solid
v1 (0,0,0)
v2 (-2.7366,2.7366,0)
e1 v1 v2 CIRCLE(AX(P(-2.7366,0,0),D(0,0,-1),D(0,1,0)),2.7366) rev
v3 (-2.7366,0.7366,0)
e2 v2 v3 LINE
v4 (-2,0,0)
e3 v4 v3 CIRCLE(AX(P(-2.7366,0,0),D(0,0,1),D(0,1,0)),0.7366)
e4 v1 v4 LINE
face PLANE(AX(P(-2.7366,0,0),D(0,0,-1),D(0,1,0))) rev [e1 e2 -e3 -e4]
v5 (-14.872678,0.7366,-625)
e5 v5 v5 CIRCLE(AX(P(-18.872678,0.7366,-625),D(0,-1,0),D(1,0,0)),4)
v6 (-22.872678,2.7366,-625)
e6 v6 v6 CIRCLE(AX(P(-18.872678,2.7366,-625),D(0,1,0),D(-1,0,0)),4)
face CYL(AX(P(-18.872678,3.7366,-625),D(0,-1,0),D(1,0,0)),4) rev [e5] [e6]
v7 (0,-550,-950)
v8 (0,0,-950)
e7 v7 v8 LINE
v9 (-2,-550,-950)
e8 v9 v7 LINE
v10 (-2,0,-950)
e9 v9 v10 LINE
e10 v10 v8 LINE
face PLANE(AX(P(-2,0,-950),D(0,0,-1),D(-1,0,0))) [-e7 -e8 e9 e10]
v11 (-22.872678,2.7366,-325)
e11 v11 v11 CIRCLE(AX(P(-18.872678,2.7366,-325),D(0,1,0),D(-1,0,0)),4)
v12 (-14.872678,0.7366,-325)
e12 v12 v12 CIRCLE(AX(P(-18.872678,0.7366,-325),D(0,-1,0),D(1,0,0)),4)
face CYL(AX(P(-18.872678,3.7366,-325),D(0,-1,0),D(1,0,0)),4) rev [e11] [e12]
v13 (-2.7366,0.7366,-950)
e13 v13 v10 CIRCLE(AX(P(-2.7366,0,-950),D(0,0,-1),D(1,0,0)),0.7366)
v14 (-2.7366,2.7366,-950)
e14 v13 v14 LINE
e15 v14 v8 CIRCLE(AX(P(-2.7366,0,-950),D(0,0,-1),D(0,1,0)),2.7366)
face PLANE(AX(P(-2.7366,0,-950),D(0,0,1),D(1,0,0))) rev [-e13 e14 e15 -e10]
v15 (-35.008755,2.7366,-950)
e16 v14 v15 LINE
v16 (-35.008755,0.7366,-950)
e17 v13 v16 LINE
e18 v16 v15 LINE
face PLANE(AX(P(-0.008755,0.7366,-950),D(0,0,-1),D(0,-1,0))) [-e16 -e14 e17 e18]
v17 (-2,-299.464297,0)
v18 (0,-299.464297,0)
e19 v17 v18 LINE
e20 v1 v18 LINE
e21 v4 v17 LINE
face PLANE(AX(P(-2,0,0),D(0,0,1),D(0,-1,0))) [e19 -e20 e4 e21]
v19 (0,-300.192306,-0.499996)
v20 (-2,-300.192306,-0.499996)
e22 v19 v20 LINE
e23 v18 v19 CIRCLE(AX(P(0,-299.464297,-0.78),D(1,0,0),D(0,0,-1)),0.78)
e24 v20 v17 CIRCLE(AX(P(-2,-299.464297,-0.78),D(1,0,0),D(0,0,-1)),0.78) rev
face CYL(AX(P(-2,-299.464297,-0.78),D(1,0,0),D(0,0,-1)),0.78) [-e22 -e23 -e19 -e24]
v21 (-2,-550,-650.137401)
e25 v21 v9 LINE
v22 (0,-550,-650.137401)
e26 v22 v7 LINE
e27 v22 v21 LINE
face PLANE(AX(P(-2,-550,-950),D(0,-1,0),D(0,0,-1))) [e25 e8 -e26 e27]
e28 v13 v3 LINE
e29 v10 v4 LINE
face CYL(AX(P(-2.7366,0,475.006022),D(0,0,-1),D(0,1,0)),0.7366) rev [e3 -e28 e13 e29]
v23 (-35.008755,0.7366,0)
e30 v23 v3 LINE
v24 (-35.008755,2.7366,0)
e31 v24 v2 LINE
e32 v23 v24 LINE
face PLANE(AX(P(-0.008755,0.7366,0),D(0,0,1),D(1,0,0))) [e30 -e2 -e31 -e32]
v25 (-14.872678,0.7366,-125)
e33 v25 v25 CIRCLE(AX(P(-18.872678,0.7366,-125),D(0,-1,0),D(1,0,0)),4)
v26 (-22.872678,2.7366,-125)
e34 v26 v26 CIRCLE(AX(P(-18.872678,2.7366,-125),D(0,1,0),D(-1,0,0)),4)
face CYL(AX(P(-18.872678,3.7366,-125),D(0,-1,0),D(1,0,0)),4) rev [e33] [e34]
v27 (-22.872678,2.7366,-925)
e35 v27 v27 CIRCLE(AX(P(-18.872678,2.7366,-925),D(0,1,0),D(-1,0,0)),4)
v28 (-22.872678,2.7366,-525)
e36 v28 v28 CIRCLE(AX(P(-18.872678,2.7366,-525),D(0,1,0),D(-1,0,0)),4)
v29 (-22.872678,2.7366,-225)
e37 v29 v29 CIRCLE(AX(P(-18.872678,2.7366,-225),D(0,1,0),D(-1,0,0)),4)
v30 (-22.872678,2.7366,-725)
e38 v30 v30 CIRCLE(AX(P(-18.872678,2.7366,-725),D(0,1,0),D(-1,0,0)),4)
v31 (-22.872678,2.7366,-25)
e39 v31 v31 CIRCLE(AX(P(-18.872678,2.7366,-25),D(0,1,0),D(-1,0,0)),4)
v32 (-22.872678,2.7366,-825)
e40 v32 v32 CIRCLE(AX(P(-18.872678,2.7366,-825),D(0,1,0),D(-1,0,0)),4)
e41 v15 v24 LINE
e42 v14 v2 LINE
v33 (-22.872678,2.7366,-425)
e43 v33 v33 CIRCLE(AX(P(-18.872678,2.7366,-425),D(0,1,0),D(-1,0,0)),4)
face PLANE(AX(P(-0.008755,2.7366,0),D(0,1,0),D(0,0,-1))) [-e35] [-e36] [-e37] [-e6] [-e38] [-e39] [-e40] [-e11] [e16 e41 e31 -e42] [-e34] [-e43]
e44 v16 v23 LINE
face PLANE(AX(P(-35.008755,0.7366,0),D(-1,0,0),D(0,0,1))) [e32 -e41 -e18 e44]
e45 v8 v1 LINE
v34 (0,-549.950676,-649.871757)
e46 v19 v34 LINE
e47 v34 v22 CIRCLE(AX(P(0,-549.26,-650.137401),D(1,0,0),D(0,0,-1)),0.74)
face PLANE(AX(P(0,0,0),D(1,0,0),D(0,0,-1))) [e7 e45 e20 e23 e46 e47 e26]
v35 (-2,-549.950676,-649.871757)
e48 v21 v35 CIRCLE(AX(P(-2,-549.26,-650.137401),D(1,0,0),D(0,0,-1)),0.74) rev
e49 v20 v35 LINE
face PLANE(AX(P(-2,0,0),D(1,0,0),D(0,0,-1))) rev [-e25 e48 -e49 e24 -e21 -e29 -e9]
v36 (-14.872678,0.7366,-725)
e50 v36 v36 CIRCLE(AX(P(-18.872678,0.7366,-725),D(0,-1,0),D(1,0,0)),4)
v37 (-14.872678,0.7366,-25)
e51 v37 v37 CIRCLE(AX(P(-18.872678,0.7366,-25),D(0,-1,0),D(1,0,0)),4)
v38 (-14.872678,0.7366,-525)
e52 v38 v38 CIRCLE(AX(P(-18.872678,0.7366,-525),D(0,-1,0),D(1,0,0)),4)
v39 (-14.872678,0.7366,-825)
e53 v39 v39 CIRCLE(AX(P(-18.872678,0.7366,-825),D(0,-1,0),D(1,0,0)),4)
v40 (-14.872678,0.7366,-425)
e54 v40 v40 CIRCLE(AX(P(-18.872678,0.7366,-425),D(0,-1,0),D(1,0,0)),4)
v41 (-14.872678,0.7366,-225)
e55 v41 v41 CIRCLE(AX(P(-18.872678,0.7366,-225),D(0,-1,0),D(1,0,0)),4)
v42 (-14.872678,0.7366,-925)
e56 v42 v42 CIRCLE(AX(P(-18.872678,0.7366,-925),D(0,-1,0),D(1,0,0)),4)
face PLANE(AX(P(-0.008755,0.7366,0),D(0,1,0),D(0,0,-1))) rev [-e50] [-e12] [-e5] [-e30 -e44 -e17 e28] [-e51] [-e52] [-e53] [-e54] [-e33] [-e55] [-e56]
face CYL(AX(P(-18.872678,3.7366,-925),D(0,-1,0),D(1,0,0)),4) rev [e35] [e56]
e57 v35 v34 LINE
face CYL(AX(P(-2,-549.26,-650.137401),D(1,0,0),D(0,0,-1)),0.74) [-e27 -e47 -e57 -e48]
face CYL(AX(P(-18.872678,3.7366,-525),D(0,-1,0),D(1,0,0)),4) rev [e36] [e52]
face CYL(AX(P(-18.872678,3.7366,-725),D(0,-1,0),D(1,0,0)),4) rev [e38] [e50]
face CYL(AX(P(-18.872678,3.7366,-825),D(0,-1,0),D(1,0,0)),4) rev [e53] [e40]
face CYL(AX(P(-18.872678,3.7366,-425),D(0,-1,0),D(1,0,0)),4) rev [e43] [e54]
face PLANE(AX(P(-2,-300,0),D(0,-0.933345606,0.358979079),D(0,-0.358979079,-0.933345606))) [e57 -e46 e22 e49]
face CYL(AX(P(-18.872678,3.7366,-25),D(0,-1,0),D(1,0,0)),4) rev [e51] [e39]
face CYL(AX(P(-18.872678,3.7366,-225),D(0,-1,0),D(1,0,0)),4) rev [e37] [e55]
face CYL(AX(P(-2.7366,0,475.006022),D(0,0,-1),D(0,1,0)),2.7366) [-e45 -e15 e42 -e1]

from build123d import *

# Parameters (mm, degrees)
BASE_FLANGE1_DEPTH     = 2
TAB1_START             = -2
TAB1_OUTLINE_W         = 950
TAB1_OUTLINE_H         = 35
TAB1_DEPTH             = 2
SKETCHED_START         = -950
SKETCHED_BEND1_DEPTH   = 950
SKETCHED_BEND1_2_DEPTH = 950
FILLET1_R              = 0.78
FILLET2_R              = 0.74
SKETCH10_R             = 4
CUT_EXTRUDE1_DEPTH     = 10


# Read off the part's stored shape, not the designer's step: Tab1, Sketched Bend1
# Sheet-metal steps are written as plain solids
with BuildPart() as part:
    # Sketch1 → Base-Flange1 (new body)
    with BuildSketch(Plane(origin=(0, 0, 0), x_dir=(0, 0, -1), z_dir=(1, 0, 0))):
        Polygon((0, 0), (0, -300), (650, -550), (950, -550), (950, 0), align=None)
    extrude(amount=-BASE_FLANGE1_DEPTH)

    # Tab1 outline → Tab1 (add)
    with BuildSketch(Plane(origin=(0, 0, 0), x_dir=(0, 0, -1), z_dir=(1, 0, 0)).offset(TAB1_START)):
        with Locations((475, 17.5)):
            Rectangle(TAB1_OUTLINE_W, TAB1_OUTLINE_H)
    extrude(amount=TAB1_DEPTH)

    # Sketched Bend1 outline → Sketched Bend1 (cut)
    with BuildSketch(Plane.XY.offset(SKETCHED_START)):
        with BuildLine():
            Line((-2, 35), (-2, 2.635602398))
            ThreePointArc((-2, 2.635602398), (-0.556604688, 1.654267209), (0, 0))
            Line((0, 0), (0, 35))
            Line((0, 35), (-2, 35))
        make_face()
    extrude(amount=SKETCHED_BEND1_DEPTH, mode=Mode.SUBTRACT)

    # Sketched Bend1 2 outline → Sketched Bend1 2 (add)
    with BuildSketch(Plane.XY.offset(SKETCHED_START)):
        with BuildLine():
            Line((-35.008755099, 0.7366), (-2.7366, 0.7366))
            ThreePointArc((-2.7366, 0.7366), (-2.215745145, 0.520854855), (-2, 0))
            Line((-2, 0), (-2, 2.635602398))
            ThreePointArc((-2, 2.635602398), (-2.364854094, 2.711233029), (-2.7366, 2.7366))
            Line((-2.7366, 2.7366), (-35.008755099, 2.7366))
            Line((-35.008755099, 2.7366), (-35.008755099, 0.7366))
        make_face()
    extrude(amount=SKETCHED_BEND1_2_DEPTH)

    # Fillet1
    fillet1_edges = [part.edges().sort_by_distance(p)[0] for p in [
        (-1, -300, 0),
    ]]
    fillet(fillet1_edges, radius=FILLET1_R)

    # Fillet2
    fillet2_edges = [part.edges().sort_by_distance(p)[0] for p in [
        (-1, -550, -650),
    ]]
    fillet(fillet2_edges, radius=FILLET2_R)

    # Sketch10 → Cut-Extrude1 (cut)
    with BuildSketch(Plane.XZ.offset(-0.7366)):
        with Locations((-18.872677549, -25)):
            Circle(SKETCH10_R)
        with Locations((-18.872677549, -125)):
            Circle(SKETCH10_R)
        with Locations((-18.872677549, -225)):
            Circle(SKETCH10_R)
        with Locations((-18.872677549, -325)):
            Circle(SKETCH10_R)
        with Locations((-18.872677549, -425)):
            Circle(SKETCH10_R)
        with Locations((-18.872677549, -525)):
            Circle(SKETCH10_R)
        with Locations((-18.872677549, -625)):
            Circle(SKETCH10_R)
        with Locations((-18.872677549, -725)):
            Circle(SKETCH10_R)
        with Locations((-18.872677549, -825)):
            Circle(SKETCH10_R)
        with Locations((-18.872677549, -925)):
            Circle(SKETCH10_R)
    extrude(amount=-CUT_EXTRUDE1_DEPTH, mode=Mode.SUBTRACT)


solid = part.part
